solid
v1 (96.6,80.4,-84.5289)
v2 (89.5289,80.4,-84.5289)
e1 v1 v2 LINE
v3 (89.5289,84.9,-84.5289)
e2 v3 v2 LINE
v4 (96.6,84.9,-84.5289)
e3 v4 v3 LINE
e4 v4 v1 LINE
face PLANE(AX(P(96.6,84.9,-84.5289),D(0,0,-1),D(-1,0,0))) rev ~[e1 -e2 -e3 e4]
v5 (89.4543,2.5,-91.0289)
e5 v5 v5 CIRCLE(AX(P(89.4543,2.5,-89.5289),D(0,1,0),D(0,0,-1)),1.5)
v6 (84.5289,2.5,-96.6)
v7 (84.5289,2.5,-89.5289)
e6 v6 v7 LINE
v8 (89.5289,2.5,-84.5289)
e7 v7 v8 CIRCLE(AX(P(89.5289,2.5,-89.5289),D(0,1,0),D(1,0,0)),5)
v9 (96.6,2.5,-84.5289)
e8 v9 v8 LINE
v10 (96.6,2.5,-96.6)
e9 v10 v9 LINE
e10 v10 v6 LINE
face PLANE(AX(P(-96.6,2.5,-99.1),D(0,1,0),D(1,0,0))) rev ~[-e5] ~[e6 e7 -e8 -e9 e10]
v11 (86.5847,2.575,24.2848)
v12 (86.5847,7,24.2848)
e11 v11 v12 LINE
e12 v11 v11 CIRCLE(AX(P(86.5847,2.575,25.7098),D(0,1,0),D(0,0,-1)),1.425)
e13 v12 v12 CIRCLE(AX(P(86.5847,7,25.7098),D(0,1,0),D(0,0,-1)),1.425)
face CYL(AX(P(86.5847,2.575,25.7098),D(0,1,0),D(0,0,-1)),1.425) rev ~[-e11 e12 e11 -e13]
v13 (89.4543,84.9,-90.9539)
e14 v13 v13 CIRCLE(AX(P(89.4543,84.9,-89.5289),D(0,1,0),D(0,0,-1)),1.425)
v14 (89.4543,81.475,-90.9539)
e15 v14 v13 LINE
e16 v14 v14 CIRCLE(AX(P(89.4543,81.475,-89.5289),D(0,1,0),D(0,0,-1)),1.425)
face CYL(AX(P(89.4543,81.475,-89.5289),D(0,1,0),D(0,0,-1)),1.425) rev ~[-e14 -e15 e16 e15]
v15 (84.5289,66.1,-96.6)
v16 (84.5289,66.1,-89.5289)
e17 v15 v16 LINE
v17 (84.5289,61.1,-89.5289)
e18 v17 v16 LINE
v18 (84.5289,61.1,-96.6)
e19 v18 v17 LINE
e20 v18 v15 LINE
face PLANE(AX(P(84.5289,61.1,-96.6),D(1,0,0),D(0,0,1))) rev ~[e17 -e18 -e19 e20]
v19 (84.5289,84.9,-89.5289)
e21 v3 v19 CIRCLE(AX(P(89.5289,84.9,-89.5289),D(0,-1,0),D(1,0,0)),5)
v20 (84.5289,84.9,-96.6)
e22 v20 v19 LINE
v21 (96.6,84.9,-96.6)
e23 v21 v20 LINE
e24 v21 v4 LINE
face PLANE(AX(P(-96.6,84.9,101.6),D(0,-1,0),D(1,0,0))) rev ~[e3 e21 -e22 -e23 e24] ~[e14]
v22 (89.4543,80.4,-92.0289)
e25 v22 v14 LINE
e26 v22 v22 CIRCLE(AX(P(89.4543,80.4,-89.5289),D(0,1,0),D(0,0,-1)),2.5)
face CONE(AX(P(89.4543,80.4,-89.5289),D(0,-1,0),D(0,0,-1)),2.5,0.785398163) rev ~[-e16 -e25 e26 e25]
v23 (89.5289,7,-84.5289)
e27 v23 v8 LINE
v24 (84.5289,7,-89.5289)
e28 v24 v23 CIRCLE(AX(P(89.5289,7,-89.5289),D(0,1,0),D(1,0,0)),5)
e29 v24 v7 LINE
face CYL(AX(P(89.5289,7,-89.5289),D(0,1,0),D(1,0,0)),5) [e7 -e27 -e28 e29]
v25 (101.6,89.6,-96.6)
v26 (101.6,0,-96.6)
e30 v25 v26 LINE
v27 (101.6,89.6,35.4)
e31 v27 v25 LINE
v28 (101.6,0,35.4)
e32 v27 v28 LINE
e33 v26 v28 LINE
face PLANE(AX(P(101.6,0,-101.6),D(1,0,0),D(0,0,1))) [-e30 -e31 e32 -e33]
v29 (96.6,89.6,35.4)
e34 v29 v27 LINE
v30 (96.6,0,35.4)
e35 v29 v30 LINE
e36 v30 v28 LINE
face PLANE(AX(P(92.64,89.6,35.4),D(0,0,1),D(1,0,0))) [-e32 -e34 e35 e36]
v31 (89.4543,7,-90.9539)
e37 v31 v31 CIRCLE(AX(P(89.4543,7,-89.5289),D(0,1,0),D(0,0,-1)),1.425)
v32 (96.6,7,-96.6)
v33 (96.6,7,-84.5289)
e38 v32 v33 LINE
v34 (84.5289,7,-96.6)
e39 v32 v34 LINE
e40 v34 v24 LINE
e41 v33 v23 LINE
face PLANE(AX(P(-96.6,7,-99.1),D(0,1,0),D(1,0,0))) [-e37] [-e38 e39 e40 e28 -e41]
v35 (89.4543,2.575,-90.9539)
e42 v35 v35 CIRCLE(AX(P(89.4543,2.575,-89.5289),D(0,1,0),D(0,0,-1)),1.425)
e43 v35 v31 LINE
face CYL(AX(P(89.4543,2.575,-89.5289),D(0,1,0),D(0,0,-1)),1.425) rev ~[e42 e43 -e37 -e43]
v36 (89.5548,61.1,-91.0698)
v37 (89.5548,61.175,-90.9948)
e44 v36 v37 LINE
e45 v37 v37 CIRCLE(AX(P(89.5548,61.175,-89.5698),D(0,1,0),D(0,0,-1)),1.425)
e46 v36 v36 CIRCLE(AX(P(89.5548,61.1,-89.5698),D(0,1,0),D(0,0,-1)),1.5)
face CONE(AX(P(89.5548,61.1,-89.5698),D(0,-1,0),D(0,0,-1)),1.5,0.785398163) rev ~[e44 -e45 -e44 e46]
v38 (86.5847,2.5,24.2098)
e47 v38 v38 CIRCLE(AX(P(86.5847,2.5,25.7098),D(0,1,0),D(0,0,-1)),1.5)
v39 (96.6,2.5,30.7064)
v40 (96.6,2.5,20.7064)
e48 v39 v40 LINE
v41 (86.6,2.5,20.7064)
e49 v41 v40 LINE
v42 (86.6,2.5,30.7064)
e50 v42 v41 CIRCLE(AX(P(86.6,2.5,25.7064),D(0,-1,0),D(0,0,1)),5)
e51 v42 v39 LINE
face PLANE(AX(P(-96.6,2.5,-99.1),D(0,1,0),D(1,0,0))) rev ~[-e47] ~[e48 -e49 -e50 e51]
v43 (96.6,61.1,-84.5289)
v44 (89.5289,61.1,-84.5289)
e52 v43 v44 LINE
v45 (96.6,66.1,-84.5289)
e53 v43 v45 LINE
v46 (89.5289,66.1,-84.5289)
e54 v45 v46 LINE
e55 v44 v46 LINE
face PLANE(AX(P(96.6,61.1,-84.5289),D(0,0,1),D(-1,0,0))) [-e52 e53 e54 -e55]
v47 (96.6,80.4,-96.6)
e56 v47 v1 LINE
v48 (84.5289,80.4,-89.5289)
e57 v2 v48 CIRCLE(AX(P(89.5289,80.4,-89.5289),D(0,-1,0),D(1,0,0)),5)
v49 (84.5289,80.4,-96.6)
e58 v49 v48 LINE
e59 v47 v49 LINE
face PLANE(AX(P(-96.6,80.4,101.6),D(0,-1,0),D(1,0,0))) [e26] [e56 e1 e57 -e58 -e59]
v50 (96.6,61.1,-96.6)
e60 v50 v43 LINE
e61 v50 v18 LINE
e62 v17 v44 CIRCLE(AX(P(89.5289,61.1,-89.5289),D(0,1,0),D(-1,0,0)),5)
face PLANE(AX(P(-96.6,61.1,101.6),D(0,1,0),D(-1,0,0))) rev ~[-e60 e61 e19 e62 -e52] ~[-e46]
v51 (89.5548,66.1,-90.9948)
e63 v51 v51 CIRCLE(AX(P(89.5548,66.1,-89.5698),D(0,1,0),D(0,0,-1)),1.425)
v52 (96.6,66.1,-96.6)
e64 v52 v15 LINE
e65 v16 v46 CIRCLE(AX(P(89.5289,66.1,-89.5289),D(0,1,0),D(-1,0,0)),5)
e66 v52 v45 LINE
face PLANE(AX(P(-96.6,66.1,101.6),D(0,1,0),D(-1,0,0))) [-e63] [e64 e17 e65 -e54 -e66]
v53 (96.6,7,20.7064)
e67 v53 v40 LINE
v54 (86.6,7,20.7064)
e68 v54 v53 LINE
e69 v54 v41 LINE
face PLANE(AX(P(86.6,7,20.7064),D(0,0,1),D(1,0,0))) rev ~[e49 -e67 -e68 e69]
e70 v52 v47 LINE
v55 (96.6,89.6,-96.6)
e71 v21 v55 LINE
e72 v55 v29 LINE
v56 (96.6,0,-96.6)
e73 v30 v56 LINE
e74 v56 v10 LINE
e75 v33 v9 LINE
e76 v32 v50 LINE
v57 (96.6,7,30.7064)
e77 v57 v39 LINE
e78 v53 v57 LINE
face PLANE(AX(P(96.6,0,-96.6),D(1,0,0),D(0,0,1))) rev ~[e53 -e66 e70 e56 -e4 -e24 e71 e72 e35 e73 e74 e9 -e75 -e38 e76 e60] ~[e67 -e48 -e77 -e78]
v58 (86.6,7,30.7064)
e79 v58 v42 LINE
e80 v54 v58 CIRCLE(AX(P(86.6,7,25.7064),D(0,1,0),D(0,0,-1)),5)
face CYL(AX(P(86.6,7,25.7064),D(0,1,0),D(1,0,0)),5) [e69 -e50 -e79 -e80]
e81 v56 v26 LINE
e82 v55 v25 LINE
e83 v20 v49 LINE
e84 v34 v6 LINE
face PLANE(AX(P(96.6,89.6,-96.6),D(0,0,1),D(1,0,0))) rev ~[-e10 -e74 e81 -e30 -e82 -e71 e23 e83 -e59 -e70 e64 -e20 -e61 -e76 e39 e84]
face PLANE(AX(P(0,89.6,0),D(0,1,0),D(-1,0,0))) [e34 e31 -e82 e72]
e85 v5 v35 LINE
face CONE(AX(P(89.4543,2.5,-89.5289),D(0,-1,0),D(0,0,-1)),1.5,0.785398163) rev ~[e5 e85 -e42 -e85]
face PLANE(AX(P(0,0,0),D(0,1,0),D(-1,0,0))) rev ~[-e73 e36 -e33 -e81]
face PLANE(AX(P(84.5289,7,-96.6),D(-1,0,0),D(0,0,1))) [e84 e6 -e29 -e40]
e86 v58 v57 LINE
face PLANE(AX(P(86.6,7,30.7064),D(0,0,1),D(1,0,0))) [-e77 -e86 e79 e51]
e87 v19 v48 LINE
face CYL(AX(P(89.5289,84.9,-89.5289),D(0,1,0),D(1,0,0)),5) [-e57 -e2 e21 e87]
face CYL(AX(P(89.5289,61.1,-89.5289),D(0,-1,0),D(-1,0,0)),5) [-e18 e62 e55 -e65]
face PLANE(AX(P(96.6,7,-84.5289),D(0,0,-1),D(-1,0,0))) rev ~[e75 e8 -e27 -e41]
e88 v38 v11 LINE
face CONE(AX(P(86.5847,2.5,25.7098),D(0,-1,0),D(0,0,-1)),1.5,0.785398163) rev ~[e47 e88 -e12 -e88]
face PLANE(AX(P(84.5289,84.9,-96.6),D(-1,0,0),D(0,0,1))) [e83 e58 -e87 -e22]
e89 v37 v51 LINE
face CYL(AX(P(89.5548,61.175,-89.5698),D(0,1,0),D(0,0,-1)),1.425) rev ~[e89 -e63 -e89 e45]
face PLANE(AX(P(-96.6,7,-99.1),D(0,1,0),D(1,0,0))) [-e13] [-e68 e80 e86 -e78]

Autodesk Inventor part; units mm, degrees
ref_plane "YZ Plane" through (0, 0, 0) normal (1, 0, 0) x (0, 1, 0)
sketch "Sketch1" plane through (0, 0, 0) normal (0, 1, 0) x (-1, 0, 0)
  line L0 (101.6, -101.6) -> (-101.6, -101.6)
  line L1 (-101.6, -101.6) -> (-101.6, 101.6)
  line L2 (-101.6, 101.6) -> (101.6, 101.6)
  line L3 (101.6, 101.6) -> (101.6, -101.6)
  line L4 (96.6, -96.6) -> (-96.6, -96.6)
  line L5 (-96.6, -96.6) -> (-96.6, 96.6)
  line L6 (-96.6, 96.6) -> (96.6, 96.6)
  line L7 (96.6, 96.6) -> (96.6, -96.6)
  line L8 (101.6, 101.6) -> (-40.4, 101.6)
  circle A0 centre (0, 0) radius 88.9
  circle A1 centre (0, 0) radius 109.3376
  line L9 (-40.4, 101.6) -> (-101.6, 40.4)
  line L10 (-45.4, 101.6) -> (-101.6, 45.4)
  line L11 (96.6, 96.6) -> (96.6, 101.6)
  line L12 (-45.4, 101.6) -> (-35.4, 101.6)
  line L13 (-35.4, 101.6) -> (-35.4, 96.6)
  line L14 (-35.4, 96.6) -> (-45.4, 96.6)
  line L15 (-45.4, 96.6) -> (-45.4, 101.6)
  point P0 (96.6, 51.2168)
  point P1 (101.6, 40.4)
  point P2 (101.6, -40.4)
  point P3 (96.6, -51.2168)
  point P4 (-96.6, 45.4)
  point P5 (-45.4, 96.6)
  dimension "d0" = 203.2
  dimension "d1" = 203.2
  dimension "d2" = 101.6
  dimension "d3" = 101.6
  dimension "d4" = 5
  dimension "d5" = 5
  dimension "d6" = 5
  dimension "d7" = 5
  dimension "d10" = 142
  dimension "d12" = 61.2
  dimension "d14" = 177.8
  dimension "d15" = 5
  dimension "d16" = 5
  dimension "d17" = 10
extrude "Extrusion1" add sketch "Sketch1" along normal blind 89.6 contours L0 A1 L4 L7 L3 | L0 A1 L4 | A1 L7 L3 | L0 L1 A1 L5 L4 | A1 L7 L11 L2 L3 | L1 L9 L5 A1 | L1 L10 A1 | A1 L10 L5 L9 | L5 L10 L6 L9 | L6 L9 L2 L13 | L15 A1 L9 | L6 L10 A1 L15 | A1 L15 L2 | A1 L10 L15
sketch "Sketch2" plane through (101.6, 0, 45.4) normal (0.7071068, 0, 0.7071068) x (0.7071068, 0, -0.7071068)
  line L0 (-179.888, 0) -> (-39.7394, 0) projected
  line L1 (-74.4788, 0) -> (-5, 0)
  line L2 (-5, 0) -> (-5, 38.1)
  line L3 (-5, 38.1) -> (-74.4788, 38.1)
  line L4 (-74.4788, 38.1) -> (-74.4788, 0)
  line L5 (0, 0) -> (0, 89.6) projected
  line L6 (-79.4788, 0) -> (-79.4788, 89.6) projected
  arc A0 (-5, 38.1) -> (-74.4788, 38.1) centre (-39.7394, 10.3696) ccw
  point P0 (-39.7394, 0)
  dimension "d20" = 5
  dimension "d21" = 5
  dimension "d22" = 38.1
  dimension "d33" = 44.45
extrude "Extrusion2" cut sketch "Sketch2" along normal mid plane 98.6
fillet "Fillet1" radius 3.175 2 edges at (101.6, 44.8, 45.4) (45.4, 44.8, 101.6)
sketch "Sketch4" plane through (101.6, 0, -101.6) normal (1, 0, 0) x (0, 0, -1)
  line L0 (-145.6849, 0) -> (-145.6849, 89.6) projected
  line L1 (-203.2, 0) -> (-203.2, 89.6) projected
  line L2 (-145.6849, 0) -> (-203.2, 0)
  line L3 (-203.2, 0) -> (-203.2, 2)
  line L4 (-203.2, 2) -> (-145.6849, 2)
  line L5 (-145.6849, 2) -> (-145.6849, 0)
  point P0 (-101.6, 0)
  point P1 (-203.2, 0)
  dimension "d28" = 2
extrude "Extrusion3" cut sketch "Sketch4" against normal blind 57.658
fillet "Fillet3" radius 3.175 1 edges at (73.5, 54.8196, 73.5)
fillet "Fillet4" radius 3.175 2 edges at (48.9355, 20.05, 98.0645) (98.0645, 20.05, 48.9355)
sketch "Sketch5" plane through (-96.6, 0, -96.6) normal (0, 0, 1) x (1, 0, 0)
  line L0 (0, 0) -> (0, 89.6) projected
  line L1 (0, 0) -> (12.7, 0)
  line L2 (12.7, 0) -> (12.7, 19.7)
  line L3 (12.7, 19.7) -> (0, 19.7)
  line L4 (0, 19.7) -> (0, 0)
  line L5 (12.7, 0) -> (0, 0)
  line L6 (0, 0) -> (0, 7)
  line L7 (0, 7) -> (12.7, 7)
  line L8 (12.7, 7) -> (12.7, 0)
  point P0 (96.6, 0)
  point P1 (0, 7)
  point P2 (12.7, 7)
  point P3 (0, 19.7)
  dimension "d34" = 12.7
  dimension "d35" = 7
  dimension "d36" = 12.7
extrude "Extrusion4" cut sketch "Sketch5" against normal blind 25.4 contours L0 L3 L2 L7
ref_plane "Work Plane3" through (-96.6, 7, -99.1) normal (0, 1, 0) x (1, 0, 0)
sketch "Sketch11" plane through (-96.6, 7, -99.1) normal (0, 1, 0) x (1, 0, 0)
  line L0 (0, -2.5) -> (0, -196.0064)
  line L1 (193.2, -2.5) -> (0, -2.5)
  line L2 (0, -2.5) -> (193.2, -2.5)
  line L3 (193.2, -144.8203) -> (141.8746, -196.0064)
  line L4 (193.2, -2.5) -> (193.2, -144.8203)
  line L5 (193.2, -144.8203) -> (141.8746, -196.0064)
  line L6 (141.8746, -196.0064) -> (0, -196.0064)
  line L7 (0, -196.0064) -> (0, -2.5)
  line L8 (0, -2.5) -> (7.0711, -9.5711)
  circle A0 centre (7.0711, -9.5711) radius 5.3203
  circle A1 centre (7.0711, -9.5711) radius 1
  line L9 (7.0711, -14.8914) -> (0, -14.8914)
  line L10 (7.0711, -9.5711) -> (7.0711, -14.8914)
  line L11 (7.0711, -9.5711) -> (12.3914, -9.5711)
  line L12 (12.3914, -2.5) -> (12.3914, -9.5711)
  line L13 (0, -196.0064) -> (7.0711, -188.9353)
  line L14 (0, -196.0064) -> (10, -196.0064) construction
  circle A2 centre (7.0711, -188.9353) radius 5
  circle A3 centre (7.0711, -188.9353) radius 1
  line L15 (7.0711, -188.9353) -> (12.0711, -188.9353)
  line L16 (12.0711, -196.0064) -> (12.0711, -188.9353)
  line L17 (7.0711, -188.9353) -> (7.0711, -183.9353)
  line L18 (0, -183.9353) -> (7.0711, -183.9353)
  line L19 (193.2, -2.5) -> (186.1289, -9.5711)
  circle A4 centre (186.1289, -9.5711) radius 5
  circle A5 centre (186.1289, -9.5711) radius 1
  line L20 (186.1289, -9.5711) -> (181.1289, -9.5711)
  line L21 (181.1289, -2.5) -> (181.1289, -9.5711)
  line L22 (186.1289, -9.5711) -> (186.1289, -14.5711)
  line L23 (193.2, -14.5711) -> (186.1289, -14.5711)
  line L24 (193.2, -142.5343) -> (193.2, -2.5)
  line L25 (0, -196.0064) -> (139.7178, -196.0064)
  line L26 (122, -124.8064) -> (198.2, -124.8064)
  line L27 (198.2, -188.3064) -> (198.2, 2.1936)
  line L28 (122, -124.8064) -> (122, -201.0064)
  line L29 (139.7178, -201.0064) -> (-5, -201.0064)
  line L30 (193.2, -124.8064) -> (183.2, -124.8064)
  circle A6 centre (183.2, -124.8064) radius 5
  circle A7 centre (183.2, -124.8064) radius 1
  line L31 (122, -196.0064) -> (122, -186.0064)
  line L32 (193.2, -2.5) -> (193.2, -144.5) projected
  line L33 (0, -2.5) -> (193.2, -2.5) projected
  line L34 (0, -200.7) -> (0, -2.5) projected
  line L35 (183.2, -119.8064) -> (193.2, -119.8064)
  line L36 (183.2, -124.8064) -> (183.2, -129.8064)
  line L37 (183.2, -129.8064) -> (193.2, -129.8064)
  point P0 (96.6, -99.1)
  point P1 (96.4746, -327.7)
  point P2 (-5, -201.0064)
  point P3 (0, -183.9353)
  point P4 (0, -196.0064)
  point P5 (12.3914, -2.5)
  point P6 (0, -14.8914)
  dimension "d96" = 10
  dimension "d97" = 2
  dimension "d98" = 10
  dimension "d99" = 45
  dimension "d100" = 10
  dimension "d101" = 2
  dimension "d102" = 10
  dimension "d103" = 10
  dimension "d104" = 2
  dimension "d105" = 76.2
  dimension "d106" = 76.2
  dimension "d109" = 2
  dimension "d113" = 228.6
  dimension "d114" = 0
  dimension "d115" = 0
  dimension "d116" = 0
  dimension "d117" = 0
extrude "Extrusion8" add sketch "Sketch11" against normal blind 4.5 contours L8 A0 L9 L0 | L1 L12 A0 L8 | A0 L11 A1 L8 | L8 A1 L10 A0 | L18 A2 L13 L0 | L10 A1 L11 A0 | L1 L19 A4 L21 | L13 A2 L16 L6 | L17 A3 L13 A2 | A2 L15 A3 L17 | L4 L23 A4 L19 | L20 A5 L22 A4 | A4 L19 A5 L20 | L13 A3 L15 A2 | A4 L22 A5 L19 | L4 L26 A6 L35 | L4 L37 A6 L26 | A6 L26 A7 | A6 L36 A7 L26 | L26 A7 L36 A6
sketch "Sketch12" plane through (-101.6, 0, 101.6) normal (0, 0, 1) x (1, 0, 0)
  line L0 (0, 0) -> (5, 0) projected
  line L1 (5, 19.7) -> (5, 89.6) projected
  line L2 (0, 0) -> (5, 0)
  line L3 (5, 0) -> (5, 61.1)
  line L4 (5, 61.1) -> (0, 61.1)
  line L5 (0, 61.1) -> (0, 0)
  point P0 (101.6, 0)
  dimension "d120" = 61.1
ref_plane "Work Plane4" through (-96.6, 61.1, 101.6) normal (0, 1, 0) x (-1, 0, 0)
sketch "Sketch13" plane through (-96.6, 61.1, 101.6) normal (0, 1, 0) x (-1, 0, 0)
  line L0 (0, -198.2) -> (0, -5)
  line L1 (-193.2, -198.2) -> (0, -198.2)
  line L2 (0, -198.2) -> (-193.2, -198.2)
  line L3 (-193.2, -56.1861) -> (-141.8746, -5)
  line L4 (-193.2, -198.2) -> (-193.2, -56.1861)
  line L5 (-193.2, -56.1861) -> (-141.8746, -5)
  line L6 (-141.8746, -5) -> (0, -5)
  line L7 (0, -5) -> (0, -198.2)
  line L8 (0, -198.2) -> (-7.0711, -191.1289)
  circle A0 centre (-7.0711, -191.1289) radius 5.3203
  circle A1 centre (-7.0711, -191.1289) radius 1
  line L9 (-7.0711, -185.8086) -> (0, -185.8086)
  line L10 (-7.0711, -191.1289) -> (-7.0711, -185.8086)
  line L11 (-7.0711, -191.1289) -> (-12.3914, -191.1289)
  line L12 (-12.3914, -198.2) -> (-12.3914, -191.1289)
  line L13 (0, -5) -> (-7.2124, -11.9268)
  line L14 (0, -5) -> (-9.998, -4.7981) construction
  circle A2 centre (-7.2124, -11.9268) radius 5
  circle A3 centre (-7.2124, -11.9268) radius 1
  line L15 (-7.2124, -11.9268) -> (-12.2124, -11.9073)
  line L16 (-12.1854, -5) -> (-12.2124, -11.9073)
  line L17 (-7.2124, -11.9268) -> (-7.2319, -16.9268)
  line L18 (0, -16.955) -> (-7.2319, -16.9268)
  line L19 (-193.2, -198.2) -> (-186.1289, -191.1289)
  circle A4 centre (-186.1289, -191.1289) radius 5
  circle A5 centre (-186.1289, -191.1289) radius 1
  line L20 (-186.1289, -191.1289) -> (-181.1289, -191.1289)
  line L21 (-181.1289, -198.2) -> (-181.1289, -191.1289)
  line L22 (-186.1289, -191.1289) -> (-186.1289, -186.1289)
  line L23 (-193.2, -186.1289) -> (-186.1289, -186.1289)
  line L24 (-193.2, -58.1657) -> (-193.2, -198.2)
  line L25 (0, -5) -> (-139.7178, -5)
  line L26 (-122, -76.2) -> (-198.2, -76.2)
  line L27 (-198.2, -12.5257) -> (-198.2, -203.0257)
  line L28 (-122, -76.2) -> (-122, 0)
  line L29 (-139.8151, 0) -> (4.9027, 0)
  line L30 (-193.2, -76.2) -> (-183.2973, -76.2)
  circle A6 centre (-183.2973, -76.2) radius 5
  circle A7 centre (-183.2973, -76.2) radius 1
  line L31 (-122, -5) -> (-122, -15)
  circle A8 centre (-122, -15) radius 5
  circle A9 centre (-122, -15) radius 1.75
  line L32 (-193.2, -198.2) -> (-193.2, -56.2)
  line L33 (0, -198.2) -> (-193.2, -198.2)
  line L34 (0, -0.1321) -> (0, -198.2)
  line L35 (-183.2973, -81.2) -> (-193.2, -81.2)
  line L36 (-183.2973, -76.2) -> (-183.2973, -71.2)
  line L37 (-183.2973, -71.2) -> (-193.2, -71.2)
  line L38 (-122, -15) -> (-127, -15)
  line L39 (-127, -15) -> (-127, -5)
  line L40 (-117, -15) -> (-117, -5)
  line L41 (0, 0) -> (0, -198.2) projected
  line L42 (0, -198.2) -> (-193.2, -198.2) projected
  line L43 (-198.2, -57.5151) -> (-198.2, -203.2) projected
  line L44 (0, -4.6936) -> (-12.0711, -4.6936) projected
  line L45 (5, 0) -> (0, 0) projected
  line L46 (-142, -5) -> (-132, -5) projected
  point P0 (-96.6, -101.6)
  point P1 (-96.6973, -101.7321)
  point P2 (-139.7178, -5)
  point P3 (-139.8151, 0)
  point P4 (4.9027, 0)
  point P5 (181.1289, -2.5)
  point P6 (193.2, -129.8064)
  point P7 (193.2, -119.8064)
  point P8 (117, -196.0064)
  point P9 (127, -196.0064)
  point P10 (0, -183.9353)
  point P11 (0, -196.0064)
  point P12 (12.3914, -2.5)
  point P13 (0, -14.8914)
  point P14 (-193.2, -71.2)
  point P15 (-193.2, -81.2)
  point P16 (0, -16.955)
  point P17 (0, -5)
  point P18 (-12.3914, -198.2)
  point P19 (0, -185.8086)
  dimension "d122" = 10
  dimension "d123" = 2
  dimension "d124" = 10
  dimension "d125" = 45
  dimension "d126" = 10
  dimension "d127" = 2
  dimension "d128" = 10
  dimension "d129" = 10
  dimension "d130" = 2
  dimension "d131" = 76.2
  dimension "d132" = 76.2
  dimension "d133" = 2
  dimension "d134" = 10
  dimension "d135" = 10
  dimension "d136" = 3.5
  dimension "d138" = 0
  dimension "d139" = 0
  dimension "d140" = 0
  dimension "d141" = 0
  dimension "d142" = 0
  dimension "d143" = 0
  dimension "d144" = 0
  dimension "d146" = 0
  dimension "d148" = 0
extrude "Extrusion9" add sketch "Sketch13" along normal blind 5 contours L8 A0 L9 L0 | L1 L12 A0 L8 | A0 L11 A1 L8 | L8 A1 L10 A0 | L18 A2 L13 L0 | L10 A1 L11 A0 | L1 L19 A4 L21 | L13 A2 L16 L6 | L17 A3 L13 A2 | A2 L15 A3 L17 | L4 L23 A4 L19 | L20 A5 L22 A4 | A4 L19 A5 L20 | L13 A3 L15 A2 | A4 L22 A5 L19
sketch "Sketch14" plane through (-101.6, 0, 101.6) normal (0, 0, 1) x (1, 0, 0)
  line L0 (12.2319, 61.1) -> (5, 61.1) projected
  line L1 (5, 62) -> (5, 84.9)
  line L2 (5, 0) -> (5, 89.6) projected
  line L3 (5, 84.9) -> (137, 84.9)
  line L4 (137, 0) -> (137, 89.6) projected
  point P0 (101.6, 0)
  point P1 (5, 61.1)
  dimension "d151" = 22.9
ref_plane "Work Plane5" through (-96.6, 84.9, 101.6) normal (0, -1, 0) x (1, 0, 0)
sketch "Sketch15" plane through (-96.6, 84.9, 101.6) normal (0, -1, 0) x (1, 0, 0)
  line L0 (0, -198.2) -> (0, -5)
  line L1 (-193.2, -198.2) -> (0, -198.2)
  line L2 (0, -198.2) -> (-193.2, -198.2)
  line L3 (-193.2, -56.1861) -> (-141.8746, -5)
  line L4 (-193.2, -198.2) -> (-193.2, -56.1861)
  line L5 (-193.2, -56.1861) -> (-141.8746, -5)
  line L6 (-141.8746, -5) -> (0, -5)
  line L7 (0, -5) -> (0, -198.2)
  line L8 (0, -198.2) -> (-7.0711, -191.1289)
  circle A0 centre (-7.0711, -191.1289) radius 5.3203
  circle A1 centre (-7.0711, -191.1289) radius 1
  line L9 (-7.0711, -185.8086) -> (0, -185.8086)
  line L10 (-7.0711, -191.1289) -> (-7.0711, -185.8086)
  line L11 (-7.0711, -191.1289) -> (-12.3914, -191.1289)
  line L12 (-12.3914, -198.2) -> (-12.3914, -191.1289)
  line L13 (0, -5) -> (-7.2124, -11.9268)
  line L14 (0, -5) -> (-9.998, -4.7981) construction
  circle A2 centre (-7.2124, -11.9268) radius 5
  circle A3 centre (-7.2124, -11.9268) radius 1
  line L15 (-7.2124, -11.9268) -> (-12.2124, -11.9073)
  line L16 (-12.1854, -5) -> (-12.2124, -11.9073)
  line L17 (-7.2124, -11.9268) -> (-7.2319, -16.9268)
  line L18 (0, -16.955) -> (-7.2319, -16.9268)
  line L19 (-193.2, -198.2) -> (-186.1289, -191.1289)
  circle A4 centre (-186.1289, -191.1289) radius 5
  circle A5 centre (-186.1289, -191.1289) radius 1
  line L20 (-186.1289, -191.1289) -> (-181.1289, -191.1289)
  line L21 (-181.1289, -198.2) -> (-181.1289, -191.1289)
  line L22 (-186.1289, -191.1289) -> (-186.1289, -186.1289)
  line L23 (-193.2, -186.1289) -> (-186.1289, -186.1289)
  line L24 (-193.2, -58.1657) -> (-193.2, -198.2)
  line L25 (0, -5) -> (-139.7178, -5)
  line L26 (-122, -76.2) -> (-198.2, -76.2)
  line L27 (-198.2, -12.5257) -> (-198.2, -203.0257)
  line L28 (-122, -76.2) -> (-122, 0)
  line L29 (-139.8151, 0) -> (4.9027, 0)
  line L30 (-193.2, -76.2) -> (-183.2973, -76.2)
  circle A6 centre (-183.2973, -76.2) radius 5
  circle A7 centre (-183.2973, -76.2) radius 1
  line L31 (-122, -5) -> (-122, -15)
  circle A8 centre (-122, -15) radius 5
  circle A9 centre (-122, -15) radius 1.75
  line L32 (-193.2, -198.2) -> (-193.2, -56.2)
  line L33 (0, -198.2) -> (-193.2, -198.2)
  line L34 (0, -0.1321) -> (0, -198.2)
  line L35 (-183.2973, -81.2) -> (-193.2, -81.2)
  line L36 (-183.2973, -76.2) -> (-183.2973, -71.2)
  line L37 (-183.2973, -71.2) -> (-193.2, -71.2)
  line L38 (-122, -15) -> (-127, -15)
  line L39 (-127, -15) -> (-127, -5)
  line L40 (-117, -15) -> (-117, -5)
  line L41 (0, 0) -> (0, -198.2)
  line L42 (0, -198.2) -> (-193.2, -198.2)
  line L43 (-198.2, -57.5151) -> (-198.2, -203.2)
  line L44 (0, -4.6936) -> (-12.0711, -4.6936)
  line L45 (5, 0) -> (0, 0)
  line L46 (-142, -5) -> (-132, -5)
  line L47 (193.2, -198.2) -> (0, -198.2)
  line L48 (0, -198.2) -> (193.2, -198.2)
  line L49 (193.2, -56.1861) -> (141.8746, -5)
  line L50 (193.2, -198.2) -> (193.2, -56.1861)
  line L51 (193.2, -56.1861) -> (141.8746, -5)
  line L52 (141.8746, -5) -> (0, -5)
  line L53 (0, -198.2) -> (7.0711, -191.1289)
  circle A10 centre (7.0711, -191.1289) radius 5.3203
  circle A11 centre (7.0711, -191.1289) radius 1
  line L54 (7.0711, -185.8086) -> (0, -185.8086)
  line L55 (7.0711, -191.1289) -> (7.0711, -185.8086)
  line L56 (7.0711, -191.1289) -> (12.3914, -191.1289)
  line L57 (12.3914, -198.2) -> (12.3914, -191.1289)
  line L58 (0, -5) -> (7.2124, -11.9268)
  line L59 (0, -5) -> (9.998, -4.7981) construction
  circle A12 centre (7.2124, -11.9268) radius 5
  circle A13 centre (7.2124, -11.9268) radius 1
  line L60 (7.2124, -11.9268) -> (12.2124, -11.9073)
  line L61 (12.1854, -5) -> (12.2124, -11.9073)
  line L62 (7.2124, -11.9268) -> (7.2319, -16.9268)
  line L63 (0, -16.955) -> (7.2319, -16.9268)
  line L64 (193.2, -198.2) -> (186.1289, -191.1289)
  circle A14 centre (186.1289, -191.1289) radius 5
  circle A15 centre (186.1289, -191.1289) radius 1
  line L65 (186.1289, -191.1289) -> (181.1289, -191.1289)
  line L66 (181.1289, -198.2) -> (181.1289, -191.1289)
  line L67 (186.1289, -191.1289) -> (186.1289, -186.1289)
  line L68 (193.2, -186.1289) -> (186.1289, -186.1289)
  line L69 (193.2, -58.1657) -> (193.2, -198.2)
  line L70 (0, -5) -> (139.7178, -5)
  line L71 (122, -76.2) -> (198.2, -76.2)
  line L72 (198.2, -12.5257) -> (198.2, -203.0257)
  line L73 (122, -76.2) -> (122, 0)
  line L74 (139.8151, 0) -> (-4.9027, 0)
  line L75 (122, -5) -> (122, -15)
  circle A16 centre (122, -15) radius 5
  circle A17 centre (122, -15) radius 1.75
  line L76 (193.2, -198.2) -> (193.2, -56.2)
  line L77 (0, -198.2) -> (193.2, -198.2)
  line L78 (122, -15) -> (127, -15)
  line L79 (127, -15) -> (127, -5)
  line L80 (117, -15) -> (117, -5)
  line L81 (0, -198.2) -> (193.2, -198.2)
  line L82 (198.2, -57.5151) -> (198.2, -203.2)
  line L83 (0, -4.6936) -> (12.0711, -4.6936)
  line L84 (-5, 0) -> (0, 0)
  line L85 (142, -5) -> (132, -5)
  line L86 (193.2, -56.2) -> (142, -5) projected
  line L87 (142, -5) -> (193.2, -56.2)
  line L88 (142, -5) -> (142, -11.9268)
  line L89 (142, -11.9268) -> (186.2732, -56.2)
  line L90 (193.2, -57.5151) -> (193.2, -56.2) projected
  line L91 (186.2732, -56.2) -> (193.2, -56.2)
  circle A18 centre (165.7974, -32.3329) radius 1
  point P0 (96.6, -101.6)
  point P1 (-96.6, -101.6)
  point P2 (-96.6973, -101.7321)
  point P3 (-139.7178, -5)
  point P4 (-139.8151, 0)
  point P5 (4.9027, 0)
  point P6 (181.1289, -2.5)
  point P7 (193.2, -129.8064)
  point P8 (193.2, -119.8064)
  point P9 (117, -196.0064)
  point P10 (127, -196.0064)
  point P11 (0, -183.9353)
  point P12 (0, -196.0064)
  point P13 (12.3914, -2.5)
  point P14 (0, -14.8914)
  point P15 (-193.2, -71.2)
  point P16 (-193.2, -81.2)
  point P17 (0, -16.955)
  point P18 (0, -5)
  point P19 (-12.3914, -198.2)
  point P20 (0, -185.8086)
  point P21 (96.6, -101.6)
  point P22 (96.6973, -101.7321)
  point P23 (139.7178, -5)
  point P24 (139.8151, 0)
  point P25 (-4.9027, 0)
  point P26 (0, -16.955)
  point P27 (0, -185.8086)
  point P28 (12.3914, -198.2)
  point P29 (188.0675, -51.0675)
  point P30 (142, -5.1251)
  dimension "d153" = 10
  dimension "d154" = 2
  dimension "d155" = 10
  dimension "d156" = 45
  dimension "d157" = 10
  dimension "d158" = 2
  dimension "d159" = 10
  dimension "d160" = 10
  dimension "d161" = 2
  dimension "d162" = 76.2
  dimension "d163" = 76.2
  dimension "d164" = 2
  dimension "d165" = 10
  dimension "d166" = 10
  dimension "d167" = 3.5
  dimension "d168" = 0
  dimension "d169" = 0
  dimension "d170" = 0
  dimension "d171" = 0
  dimension "d172" = 0
  dimension "d173" = 0
  dimension "d174" = 0
  dimension "d175" = 0
  dimension "d176" = 0
  dimension "d179" = 0.3064
  dimension "d210" = 2
  dimension "d211" = 2.5
extrude "Extrusion10" add sketch "Sketch15" along normal blind 4.5 contours L53 A10 L57 L47 | L0 L54 A10 L53 | A10 L55 A11 L53 | L53 A11 L56 A10 | L0 L58 A12 L63 | A10 L56 A11 L55 | L66 A14 L64 L47 | L52 L61 A12 L58 | L62 A13 L60 A12 | A12 L58 A13 L62 | L64 A14 L68 L50 | L65 A15 L64 A14 | A14 L67 A15 L65 | A12 L60 A13 L58 | L64 A15 L67 A14 | L91 L89 L88 L49 L86 | L49 L88 L86
fillet "Fillet5" radius 3.175 2 edges at (101.6, 44.8, -101.6) (-101.6, 44.8, -101.6)
sketch "Sketch16" plane through (0, 89.6, 0) normal (0, 1, 0) x (1, 0, 0)
  line L0 (-96.6, -101.6) -> (-96.6, 96.6) projected
  line L1 (-96.6, -98.35) -> (-99.1, -98.35)
  line L2 (-99.1, -98.35) -> (-99.1, -100.1)
  line L3 (-99.1, -100.1) -> (-96.6, -100.1)
  line L4 (-96.6, -100.1) -> (-96.6, -98.35)
  line L5 (-101.6, -101.6) -> (-96.6, -101.6) projected
  line L6 (35.4, -96.6) -> (35.4, -101.6) projected
  line L7 (35.4, -100.1) -> (37.9, -100.1)
  line L8 (37.9, -100.1) -> (37.9, -98.35)
  line L9 (37.9, -98.35) -> (35.4, -98.35)
  line L10 (35.4, -98.35) -> (35.4, -100.1)
  line L11 (35.4, -101.6) -> (44.0849, -101.6) projected
  line L12 (45.4, -96.6) -> (35.4, -96.6) projected
  line L13 (-96.6, -100.1) -> (35.4, -100.1)
  line L14 (-101.6, 98.425) -> (-101.6, -101.6) projected
  point P0 (0, 0)
  dimension "d182" = 1.5
  dimension "d183" = 1.75
  dimension "d184" = 2.5
  dimension "d185" = 1.5
  dimension "d186" = 1.75
  dimension "d187" = 2.5
  dimension "d188" = 1.75
  dimension "d191" = 132
  dimension "d194" = 2.5
extrude "Extrusion11" cut sketch "Sketch16" against normal through all
sketch "Sketch17" plane through (0, 0, 0) normal (0, -1, 0) x (1, 0, 0)
  point P0 (0, 0)
sketch "Sketch18" plane through (0, 89.6, 0) normal (0, 1, 0) x (1, 0, 0)
  line L0 (45.4, -96.6) -> (35.4, -96.6) projected
  line L1 (35.4, -101.6) -> (44.0849, -101.6) projected
  line L2 (35.4, -96.6) -> (39.0179, -96.6)
  line L3 (39.0179, -96.6) -> (39.0179, -101.6)
  line L4 (39.0179, -101.6) -> (35.4, -101.6)
  line L5 (35.4, -101.6) -> (35.4, -96.6)
  line L6 (-101.6, 98.425) -> (-101.6, -101.6) projected
  line L7 (-96.6, -101.6) -> (-96.6, -100.1) projected
  line L8 (-101.6, -96.6) -> (-96.6, -96.6)
  line L9 (-96.6, -96.6) -> (-96.6, -101.6)
  line L10 (-96.6, -101.6) -> (-101.6, -101.6)
  line L11 (-101.6, -101.6) -> (-101.6, -96.6)
  point P0 (0, 0)
  point P1 (-101.6, -101.6)
extrude "Extrusion12" add sketch "Sketch18" against normal blind 5
sketch "Sketch22" plane through (-96.6, 61.1, 101.6) normal (0, -1, 0) x (1, 0, 0)
  circle A0 centre (7.1759, -11.8979) radius 1.0267
  circle A1 centre (7.0845, -191.0815) radius 1.099
  circle A2 centre (186.1548, -191.1698) radius 1.0412
  point P0 (96.6, -101.6)
hole "Hole1" at (-89.4241, 61.1, 89.7021) at (-89.5155, 61.1, -89.4815) at (89.5548, 61.1, -89.5698) direction (0, 1, 0) diameter 2.85 depth 12.7 tip angle 118 countersink diameter 3 countersink angle 90 thread size "M3.5x0.6" class "6H" standard "ANSI Metric M Profile"
sketch "Sketch23" plane through (-96.6, 2.5, -99.1) normal (0, -1, 0) x (1, 0, 0)
  point P0 (96.6, 99.1)
sketch "Sketch24" plane through (-96.6, 2.5, -99.1) normal (0, -1, 0) x (1, 0, 0)
  circle A0 centre (7.0728, 188.9158) radius 1.0195
  circle A1 centre (7.0711, 9.5711) radius 1 projected
  circle A2 centre (7.0711, 9.5711) radius 1
  circle A3 centre (186.0543, 9.5711) radius 1.0028
  circle A4 centre (183.1847, 124.8098) radius 1.0762
  point P0 (96.6, 99.1)
hole "Hole2" at (-89.5272, 2.5, 89.8158) at (-89.5289, 2.5, -89.5289) at (89.4543, 2.5, -89.5289) at (86.5847, 2.5, 25.7098) direction (0, 1, 0) diameter 2.85 depth 12.7 tip angle 118 countersink diameter 3 countersink angle 90 thread size "M3.5x0.6" class "6H" standard "ANSI Metric M Profile"
sketch "Sketch25" plane through (-96.6, 80.4, 101.6) normal (0, -1, 0) x (1, 0, 0)
  circle A0 centre (7.2045, -11.9025) radius 1.0659
  circle A1 centre (7.0584, -191.1632) radius 1.0343
  circle A2 centre (186.0543, -191.1289) radius 1.5 projected
  circle A3 centre (186.0543, -191.1289) radius 1.0077
  circle A4 centre (183.0986, -75.9599) radius 1.4972
  circle A5 centre (165.7974, -32.3329) radius 1 projected
  circle A6 centre (165.7974, -32.3329) radius 1
  point P0 (96.6, -101.6)
hole "Hole3" at (69.1974, 80.4, 69.2671) at (86.4986, 80.4, 25.6401) at (89.4543, 80.4, -89.5289) at (-89.5416, 80.4, -89.5632) at (-89.3955, 80.4, 89.6975) direction (0, 1, 0) diameter 2.85 depth 12.7 tip angle 118 countersink diameter 5 countersink angle 90 thread size "M3.5x0.6" class "6H" standard "ANSI Metric M Profile"
sketch "Sketch26" plane through (0, 89.6, 0) normal (0, 1, 0) x (1, 0, 0)
  line L0 (92.64, -35.4) -> (108.276, -35.4)
  line L1 (89.6732, -45.4) -> (96.6, -45.4) projected
  line L2 (35.4, -96.6) -> (35.4, -101.6) projected
  line L3 (45.4, -96.6) -> (45.4, -89.6732) projected
  line L4 (92.64, -35.4) -> (0, -35.4)
  line L5 (0, -126.5642) -> (108.276, -126.5642)
  line L6 (108.276, -126.5642) -> (108.276, -35.4)
  line L7 (0, -126.5642) -> (-133.2655, -126.5642)
  line L8 (-133.2655, -126.5642) -> (-133.2655, 117.3259)
  line L9 (-133.2655, 117.3259) -> (96.6, 117.3259)
  line L10 (96.6, 117.3259) -> (101.6, 117.3259)
  line L11 (-96.6, 96.6) -> (96.6, 96.6) projected
  line L12 (96.6, 96.6) -> (101.6, 96.6)
  line L13 (101.6, 96.6) -> (101.6, 117.3259)
  line L14 (96.6, 96.6) -> (96.6, 84.5289) projected
  line L15 (96.6, 96.6) -> (0, 96.6)
  line L16 (0, 96.6) -> (0, -35.4)
  point P0 (0, 0)
  dimension "d219" = 10
  dimension "d220" = 10
extrude "Extrusion13" cut sketch "Sketch26" against normal up to surface (89.6 mm away)
equation "\"d1\" = d0"
equation "\"d2\" = 0.5 * d0"
equation "\"d3\" = 0.5 * d0"
properties part number "Box_Walls_2"
